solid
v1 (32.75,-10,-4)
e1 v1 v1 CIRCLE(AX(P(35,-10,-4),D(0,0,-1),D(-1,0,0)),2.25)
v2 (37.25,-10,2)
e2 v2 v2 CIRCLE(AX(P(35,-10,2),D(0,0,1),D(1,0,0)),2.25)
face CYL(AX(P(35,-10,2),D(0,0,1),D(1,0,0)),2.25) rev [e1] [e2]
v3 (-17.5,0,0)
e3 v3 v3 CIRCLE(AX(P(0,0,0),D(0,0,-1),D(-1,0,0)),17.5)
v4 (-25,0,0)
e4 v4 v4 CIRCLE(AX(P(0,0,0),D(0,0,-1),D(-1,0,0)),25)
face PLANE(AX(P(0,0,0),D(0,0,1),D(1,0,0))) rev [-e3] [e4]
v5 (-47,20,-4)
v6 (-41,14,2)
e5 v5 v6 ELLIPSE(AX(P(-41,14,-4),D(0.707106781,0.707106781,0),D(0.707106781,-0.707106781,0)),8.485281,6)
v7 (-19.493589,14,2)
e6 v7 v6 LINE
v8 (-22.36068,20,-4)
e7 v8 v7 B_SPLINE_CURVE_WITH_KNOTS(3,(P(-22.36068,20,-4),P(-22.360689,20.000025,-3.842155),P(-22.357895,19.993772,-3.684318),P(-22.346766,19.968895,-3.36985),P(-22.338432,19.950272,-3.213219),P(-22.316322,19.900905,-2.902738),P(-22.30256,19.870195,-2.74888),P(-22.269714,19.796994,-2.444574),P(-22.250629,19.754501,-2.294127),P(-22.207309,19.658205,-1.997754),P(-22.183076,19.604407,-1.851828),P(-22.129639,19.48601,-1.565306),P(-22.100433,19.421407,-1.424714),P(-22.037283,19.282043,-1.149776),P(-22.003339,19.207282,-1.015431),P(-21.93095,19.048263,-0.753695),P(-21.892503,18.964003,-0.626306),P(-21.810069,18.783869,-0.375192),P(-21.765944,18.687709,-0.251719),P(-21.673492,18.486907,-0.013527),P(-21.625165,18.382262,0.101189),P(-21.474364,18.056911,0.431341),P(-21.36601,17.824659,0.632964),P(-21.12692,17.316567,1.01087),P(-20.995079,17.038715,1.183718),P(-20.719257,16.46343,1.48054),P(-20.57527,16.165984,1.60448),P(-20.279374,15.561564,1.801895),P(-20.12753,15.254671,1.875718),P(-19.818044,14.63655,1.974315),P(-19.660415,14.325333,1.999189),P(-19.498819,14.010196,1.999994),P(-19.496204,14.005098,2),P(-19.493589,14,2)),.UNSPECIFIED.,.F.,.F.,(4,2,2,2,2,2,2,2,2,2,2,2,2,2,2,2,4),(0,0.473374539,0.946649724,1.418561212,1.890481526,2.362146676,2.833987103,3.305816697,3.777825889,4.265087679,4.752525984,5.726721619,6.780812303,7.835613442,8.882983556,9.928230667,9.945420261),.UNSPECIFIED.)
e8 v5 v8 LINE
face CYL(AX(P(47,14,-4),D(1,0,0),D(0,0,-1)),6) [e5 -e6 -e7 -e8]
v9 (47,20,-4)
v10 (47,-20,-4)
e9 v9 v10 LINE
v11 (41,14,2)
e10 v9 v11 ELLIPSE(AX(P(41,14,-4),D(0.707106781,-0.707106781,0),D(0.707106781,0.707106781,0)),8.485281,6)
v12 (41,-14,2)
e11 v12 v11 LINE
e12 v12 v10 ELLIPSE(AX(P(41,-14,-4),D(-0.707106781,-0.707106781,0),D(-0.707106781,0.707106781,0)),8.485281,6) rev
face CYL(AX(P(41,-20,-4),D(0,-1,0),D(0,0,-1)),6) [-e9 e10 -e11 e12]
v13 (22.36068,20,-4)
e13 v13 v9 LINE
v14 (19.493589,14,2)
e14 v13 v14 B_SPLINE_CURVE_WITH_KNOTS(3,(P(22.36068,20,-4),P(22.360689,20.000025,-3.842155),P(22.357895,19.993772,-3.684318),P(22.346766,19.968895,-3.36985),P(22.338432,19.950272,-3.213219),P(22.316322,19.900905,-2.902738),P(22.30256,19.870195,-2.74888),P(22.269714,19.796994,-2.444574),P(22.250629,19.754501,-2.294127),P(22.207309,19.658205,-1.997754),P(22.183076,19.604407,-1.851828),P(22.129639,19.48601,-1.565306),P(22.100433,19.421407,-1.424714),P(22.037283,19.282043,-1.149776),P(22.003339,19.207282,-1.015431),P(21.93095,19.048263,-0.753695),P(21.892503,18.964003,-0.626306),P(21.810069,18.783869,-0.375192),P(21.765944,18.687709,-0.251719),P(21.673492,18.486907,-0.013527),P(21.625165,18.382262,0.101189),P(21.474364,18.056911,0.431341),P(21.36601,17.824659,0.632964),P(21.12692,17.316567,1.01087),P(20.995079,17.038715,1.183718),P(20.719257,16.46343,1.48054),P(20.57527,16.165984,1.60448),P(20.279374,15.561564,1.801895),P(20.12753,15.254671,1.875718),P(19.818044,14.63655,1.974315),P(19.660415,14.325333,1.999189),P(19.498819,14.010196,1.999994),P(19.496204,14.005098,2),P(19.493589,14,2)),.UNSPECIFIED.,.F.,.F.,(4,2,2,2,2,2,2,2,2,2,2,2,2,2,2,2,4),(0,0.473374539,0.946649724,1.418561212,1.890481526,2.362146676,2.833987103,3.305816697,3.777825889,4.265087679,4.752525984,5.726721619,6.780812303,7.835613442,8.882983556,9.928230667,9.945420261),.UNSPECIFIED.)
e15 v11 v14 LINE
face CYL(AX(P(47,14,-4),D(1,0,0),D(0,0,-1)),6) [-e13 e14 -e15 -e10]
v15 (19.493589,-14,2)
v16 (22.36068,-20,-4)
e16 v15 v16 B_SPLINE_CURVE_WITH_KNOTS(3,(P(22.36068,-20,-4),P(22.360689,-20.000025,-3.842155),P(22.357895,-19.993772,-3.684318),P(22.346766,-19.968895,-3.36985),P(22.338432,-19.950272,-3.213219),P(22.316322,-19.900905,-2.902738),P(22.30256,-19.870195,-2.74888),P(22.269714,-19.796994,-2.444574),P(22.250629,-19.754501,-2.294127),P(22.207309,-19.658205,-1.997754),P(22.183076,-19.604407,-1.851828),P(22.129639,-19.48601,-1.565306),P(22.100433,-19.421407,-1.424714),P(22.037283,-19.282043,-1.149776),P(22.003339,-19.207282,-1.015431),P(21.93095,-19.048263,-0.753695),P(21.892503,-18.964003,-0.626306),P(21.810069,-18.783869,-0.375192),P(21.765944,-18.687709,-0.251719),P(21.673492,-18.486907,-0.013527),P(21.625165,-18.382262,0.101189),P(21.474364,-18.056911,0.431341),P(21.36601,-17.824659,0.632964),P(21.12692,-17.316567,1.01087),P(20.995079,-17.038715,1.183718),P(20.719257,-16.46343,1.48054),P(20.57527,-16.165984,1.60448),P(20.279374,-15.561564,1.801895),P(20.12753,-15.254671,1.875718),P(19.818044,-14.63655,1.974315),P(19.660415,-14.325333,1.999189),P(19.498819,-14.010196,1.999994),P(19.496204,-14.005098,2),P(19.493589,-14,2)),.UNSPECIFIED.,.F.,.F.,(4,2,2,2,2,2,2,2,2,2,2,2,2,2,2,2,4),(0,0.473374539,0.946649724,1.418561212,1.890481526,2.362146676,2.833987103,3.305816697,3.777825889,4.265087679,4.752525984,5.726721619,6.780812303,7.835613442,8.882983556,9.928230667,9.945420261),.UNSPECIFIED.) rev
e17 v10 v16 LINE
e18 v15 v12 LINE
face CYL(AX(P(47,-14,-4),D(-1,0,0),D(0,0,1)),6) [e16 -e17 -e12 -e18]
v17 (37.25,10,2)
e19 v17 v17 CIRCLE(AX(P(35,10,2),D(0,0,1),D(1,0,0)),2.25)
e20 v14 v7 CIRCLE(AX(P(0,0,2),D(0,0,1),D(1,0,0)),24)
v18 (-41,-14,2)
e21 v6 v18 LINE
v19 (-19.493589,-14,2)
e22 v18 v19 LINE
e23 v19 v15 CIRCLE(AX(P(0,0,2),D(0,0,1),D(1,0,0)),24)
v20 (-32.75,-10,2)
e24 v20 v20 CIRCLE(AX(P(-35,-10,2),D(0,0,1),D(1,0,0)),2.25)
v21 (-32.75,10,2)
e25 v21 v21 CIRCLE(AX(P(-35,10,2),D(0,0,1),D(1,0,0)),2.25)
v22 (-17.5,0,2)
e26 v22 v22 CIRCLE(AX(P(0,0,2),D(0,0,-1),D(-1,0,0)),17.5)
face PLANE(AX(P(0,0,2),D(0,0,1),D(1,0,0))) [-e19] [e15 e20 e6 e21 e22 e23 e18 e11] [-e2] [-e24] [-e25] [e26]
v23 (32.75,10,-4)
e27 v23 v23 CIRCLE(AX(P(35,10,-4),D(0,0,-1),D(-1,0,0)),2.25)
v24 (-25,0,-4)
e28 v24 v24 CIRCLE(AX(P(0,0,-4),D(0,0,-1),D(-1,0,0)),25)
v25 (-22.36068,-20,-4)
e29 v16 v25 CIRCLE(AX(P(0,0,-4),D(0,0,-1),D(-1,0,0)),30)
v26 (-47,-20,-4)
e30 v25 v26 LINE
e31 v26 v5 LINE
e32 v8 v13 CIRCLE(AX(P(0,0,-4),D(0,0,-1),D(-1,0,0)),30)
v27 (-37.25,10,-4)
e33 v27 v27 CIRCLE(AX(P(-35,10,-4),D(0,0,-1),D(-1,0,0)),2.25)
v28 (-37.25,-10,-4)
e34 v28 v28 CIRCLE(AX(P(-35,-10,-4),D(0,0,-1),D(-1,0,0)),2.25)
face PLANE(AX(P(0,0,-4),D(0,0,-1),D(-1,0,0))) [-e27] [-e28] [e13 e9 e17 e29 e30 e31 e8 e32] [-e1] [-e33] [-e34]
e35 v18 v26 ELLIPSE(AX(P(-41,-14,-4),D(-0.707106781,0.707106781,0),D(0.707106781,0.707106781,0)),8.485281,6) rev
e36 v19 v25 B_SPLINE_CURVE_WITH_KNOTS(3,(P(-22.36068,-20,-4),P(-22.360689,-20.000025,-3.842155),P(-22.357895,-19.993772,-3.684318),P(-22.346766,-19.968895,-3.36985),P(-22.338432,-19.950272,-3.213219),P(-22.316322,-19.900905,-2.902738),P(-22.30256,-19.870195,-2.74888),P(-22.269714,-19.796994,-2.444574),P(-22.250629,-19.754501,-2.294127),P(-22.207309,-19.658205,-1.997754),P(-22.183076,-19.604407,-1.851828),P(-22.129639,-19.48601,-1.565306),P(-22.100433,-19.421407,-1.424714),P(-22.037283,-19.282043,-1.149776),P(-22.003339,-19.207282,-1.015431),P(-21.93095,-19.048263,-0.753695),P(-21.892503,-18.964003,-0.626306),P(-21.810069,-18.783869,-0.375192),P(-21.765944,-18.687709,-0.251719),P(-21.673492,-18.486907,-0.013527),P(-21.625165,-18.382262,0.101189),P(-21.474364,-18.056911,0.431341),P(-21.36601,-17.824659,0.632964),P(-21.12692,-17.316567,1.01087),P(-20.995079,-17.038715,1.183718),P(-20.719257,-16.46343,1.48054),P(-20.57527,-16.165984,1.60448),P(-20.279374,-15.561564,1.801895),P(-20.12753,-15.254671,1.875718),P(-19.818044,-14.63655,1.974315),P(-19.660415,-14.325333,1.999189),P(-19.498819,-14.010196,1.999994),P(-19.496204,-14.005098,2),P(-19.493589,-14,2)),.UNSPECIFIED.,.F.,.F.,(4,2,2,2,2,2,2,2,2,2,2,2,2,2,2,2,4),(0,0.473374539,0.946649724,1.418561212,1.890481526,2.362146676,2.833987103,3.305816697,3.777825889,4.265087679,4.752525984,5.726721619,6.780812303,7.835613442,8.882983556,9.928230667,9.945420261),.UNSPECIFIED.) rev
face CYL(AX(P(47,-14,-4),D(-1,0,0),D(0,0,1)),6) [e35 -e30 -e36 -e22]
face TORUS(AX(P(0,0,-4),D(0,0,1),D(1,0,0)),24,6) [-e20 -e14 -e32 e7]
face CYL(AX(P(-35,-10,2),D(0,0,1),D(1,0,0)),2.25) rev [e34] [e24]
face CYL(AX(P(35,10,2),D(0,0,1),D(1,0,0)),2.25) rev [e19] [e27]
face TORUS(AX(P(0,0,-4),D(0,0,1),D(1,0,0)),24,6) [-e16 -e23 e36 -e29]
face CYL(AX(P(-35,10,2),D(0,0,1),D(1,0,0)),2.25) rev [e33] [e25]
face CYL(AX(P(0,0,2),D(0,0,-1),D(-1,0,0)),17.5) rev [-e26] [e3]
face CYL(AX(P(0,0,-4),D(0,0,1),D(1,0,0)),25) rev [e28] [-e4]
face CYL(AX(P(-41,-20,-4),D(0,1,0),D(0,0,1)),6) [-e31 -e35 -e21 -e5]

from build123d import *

# Parameters (mm, degrees)
SKETCH1_R            = 30
BOSS_EXTRUDE1_DEPTH  = 2
BOSS_EXTRUDE2_START  = 4
SKETCH2_R            = 30
SKETCH2_R_2          = 25
BOSS_EXTRUDE2_DEPTH  = 4
BOSS_EXTRUDE3_REACH  = 44.849
SKETCH3_W            = 94
SKETCH3_H            = 40
SKETCH4_R            = 25
CUT_EXTRUDE1_DEPTH   = 4
SKETCH5_R            = 17.5
CUT_EXTRUDE2_DEPTH   = 56.901699437
FILLET1_R            = 6
M4_CLEARANCE_HOLE1_D = 4.5


with BuildPart() as part:
    # Sketch1 → Boss-Extrude1 (new body)
    with BuildSketch(Plane.XY):
        Circle(SKETCH1_R)
    extrude(amount=BOSS_EXTRUDE1_DEPTH)

    # Sketch2 → Boss-Extrude2 (add)
    with BuildSketch(Plane(origin=(0, 0, 0), x_dir=(-1, 0, 0), z_dir=(0, 0, -1)).offset(BOSS_EXTRUDE2_START)):
        Circle(SKETCH2_R)
        Circle(SKETCH2_R_2, mode=Mode.SUBTRACT)
    extrude(amount=-BOSS_EXTRUDE2_DEPTH)

    # Boss-Extrude3: up to this face of the body (flat: up to its plane)
    boss_extrude3_end = Plane(part.part.faces().sort_by_distance((0, 0, 2))[0])
    # Sketch3 → Boss-Extrude3 (add, up to the picked face)
    with BuildSketch(Plane(origin=(0, 0, -4), x_dir=(-1, 0, 0), z_dir=(0, 0, -1)), mode=Mode.PRIVATE) as boss_extrude3_sk1:
        Rectangle(SKETCH3_W, SKETCH3_H)
    boss_extrude3_tool1 = split(extrude(boss_extrude3_sk1.sketch, amount=-BOSS_EXTRUDE3_REACH, mode=Mode.PRIVATE), bisect_by=boss_extrude3_end, keep=Keep.BOTH, mode=Mode.PRIVATE)
    add(boss_extrude3_tool1.solids().sort_by(Axis((0, 0, -4), (0, 0, 1)))[0])

    # Sketch4 → Cut-Extrude1 (cut)
    with BuildSketch(Plane(origin=(0, 0, -4), x_dir=(-1, 0, 0), z_dir=(0, 0, -1))):
        Circle(SKETCH4_R)
    extrude(amount=-CUT_EXTRUDE1_DEPTH, mode=Mode.SUBTRACT)

    # Sketch5 → Cut-Extrude2 (cut, through all)
    with BuildSketch(Plane(origin=(0, 0, 0), x_dir=(-1, 0, 0), z_dir=(0, 0, -1))):
        Circle(SKETCH5_R)
    extrude(amount=-CUT_EXTRUDE2_DEPTH, mode=Mode.SUBTRACT)

    # Fillet1
    fillet1_edges = [part.edges().sort_by_distance(p)[0] for p in [
        (47, 0, 2),
        (34.680339887, -20, 2),
        (34.680339887, 20, 2),
        (0, 30, 2),
        (0, -30, 2),
        (-34.680339887, -20, 2),
        (-47, 0, 2),
        (-34.680339887, 20, 2),
    ]]
    fillet(fillet1_edges, radius=FILLET1_R - 0.0001)  # a hair under: the kernel refuses the full size

    # M4 Clearance Hole1 (through all)
    with Locations(Plane.XY.offset(2)):
        with Locations((-35, 10), (-35, -10), (35, 10), (35, -10)):
            Hole(M4_CLEARANCE_HOLE1_D / 2)


solid = part.part
